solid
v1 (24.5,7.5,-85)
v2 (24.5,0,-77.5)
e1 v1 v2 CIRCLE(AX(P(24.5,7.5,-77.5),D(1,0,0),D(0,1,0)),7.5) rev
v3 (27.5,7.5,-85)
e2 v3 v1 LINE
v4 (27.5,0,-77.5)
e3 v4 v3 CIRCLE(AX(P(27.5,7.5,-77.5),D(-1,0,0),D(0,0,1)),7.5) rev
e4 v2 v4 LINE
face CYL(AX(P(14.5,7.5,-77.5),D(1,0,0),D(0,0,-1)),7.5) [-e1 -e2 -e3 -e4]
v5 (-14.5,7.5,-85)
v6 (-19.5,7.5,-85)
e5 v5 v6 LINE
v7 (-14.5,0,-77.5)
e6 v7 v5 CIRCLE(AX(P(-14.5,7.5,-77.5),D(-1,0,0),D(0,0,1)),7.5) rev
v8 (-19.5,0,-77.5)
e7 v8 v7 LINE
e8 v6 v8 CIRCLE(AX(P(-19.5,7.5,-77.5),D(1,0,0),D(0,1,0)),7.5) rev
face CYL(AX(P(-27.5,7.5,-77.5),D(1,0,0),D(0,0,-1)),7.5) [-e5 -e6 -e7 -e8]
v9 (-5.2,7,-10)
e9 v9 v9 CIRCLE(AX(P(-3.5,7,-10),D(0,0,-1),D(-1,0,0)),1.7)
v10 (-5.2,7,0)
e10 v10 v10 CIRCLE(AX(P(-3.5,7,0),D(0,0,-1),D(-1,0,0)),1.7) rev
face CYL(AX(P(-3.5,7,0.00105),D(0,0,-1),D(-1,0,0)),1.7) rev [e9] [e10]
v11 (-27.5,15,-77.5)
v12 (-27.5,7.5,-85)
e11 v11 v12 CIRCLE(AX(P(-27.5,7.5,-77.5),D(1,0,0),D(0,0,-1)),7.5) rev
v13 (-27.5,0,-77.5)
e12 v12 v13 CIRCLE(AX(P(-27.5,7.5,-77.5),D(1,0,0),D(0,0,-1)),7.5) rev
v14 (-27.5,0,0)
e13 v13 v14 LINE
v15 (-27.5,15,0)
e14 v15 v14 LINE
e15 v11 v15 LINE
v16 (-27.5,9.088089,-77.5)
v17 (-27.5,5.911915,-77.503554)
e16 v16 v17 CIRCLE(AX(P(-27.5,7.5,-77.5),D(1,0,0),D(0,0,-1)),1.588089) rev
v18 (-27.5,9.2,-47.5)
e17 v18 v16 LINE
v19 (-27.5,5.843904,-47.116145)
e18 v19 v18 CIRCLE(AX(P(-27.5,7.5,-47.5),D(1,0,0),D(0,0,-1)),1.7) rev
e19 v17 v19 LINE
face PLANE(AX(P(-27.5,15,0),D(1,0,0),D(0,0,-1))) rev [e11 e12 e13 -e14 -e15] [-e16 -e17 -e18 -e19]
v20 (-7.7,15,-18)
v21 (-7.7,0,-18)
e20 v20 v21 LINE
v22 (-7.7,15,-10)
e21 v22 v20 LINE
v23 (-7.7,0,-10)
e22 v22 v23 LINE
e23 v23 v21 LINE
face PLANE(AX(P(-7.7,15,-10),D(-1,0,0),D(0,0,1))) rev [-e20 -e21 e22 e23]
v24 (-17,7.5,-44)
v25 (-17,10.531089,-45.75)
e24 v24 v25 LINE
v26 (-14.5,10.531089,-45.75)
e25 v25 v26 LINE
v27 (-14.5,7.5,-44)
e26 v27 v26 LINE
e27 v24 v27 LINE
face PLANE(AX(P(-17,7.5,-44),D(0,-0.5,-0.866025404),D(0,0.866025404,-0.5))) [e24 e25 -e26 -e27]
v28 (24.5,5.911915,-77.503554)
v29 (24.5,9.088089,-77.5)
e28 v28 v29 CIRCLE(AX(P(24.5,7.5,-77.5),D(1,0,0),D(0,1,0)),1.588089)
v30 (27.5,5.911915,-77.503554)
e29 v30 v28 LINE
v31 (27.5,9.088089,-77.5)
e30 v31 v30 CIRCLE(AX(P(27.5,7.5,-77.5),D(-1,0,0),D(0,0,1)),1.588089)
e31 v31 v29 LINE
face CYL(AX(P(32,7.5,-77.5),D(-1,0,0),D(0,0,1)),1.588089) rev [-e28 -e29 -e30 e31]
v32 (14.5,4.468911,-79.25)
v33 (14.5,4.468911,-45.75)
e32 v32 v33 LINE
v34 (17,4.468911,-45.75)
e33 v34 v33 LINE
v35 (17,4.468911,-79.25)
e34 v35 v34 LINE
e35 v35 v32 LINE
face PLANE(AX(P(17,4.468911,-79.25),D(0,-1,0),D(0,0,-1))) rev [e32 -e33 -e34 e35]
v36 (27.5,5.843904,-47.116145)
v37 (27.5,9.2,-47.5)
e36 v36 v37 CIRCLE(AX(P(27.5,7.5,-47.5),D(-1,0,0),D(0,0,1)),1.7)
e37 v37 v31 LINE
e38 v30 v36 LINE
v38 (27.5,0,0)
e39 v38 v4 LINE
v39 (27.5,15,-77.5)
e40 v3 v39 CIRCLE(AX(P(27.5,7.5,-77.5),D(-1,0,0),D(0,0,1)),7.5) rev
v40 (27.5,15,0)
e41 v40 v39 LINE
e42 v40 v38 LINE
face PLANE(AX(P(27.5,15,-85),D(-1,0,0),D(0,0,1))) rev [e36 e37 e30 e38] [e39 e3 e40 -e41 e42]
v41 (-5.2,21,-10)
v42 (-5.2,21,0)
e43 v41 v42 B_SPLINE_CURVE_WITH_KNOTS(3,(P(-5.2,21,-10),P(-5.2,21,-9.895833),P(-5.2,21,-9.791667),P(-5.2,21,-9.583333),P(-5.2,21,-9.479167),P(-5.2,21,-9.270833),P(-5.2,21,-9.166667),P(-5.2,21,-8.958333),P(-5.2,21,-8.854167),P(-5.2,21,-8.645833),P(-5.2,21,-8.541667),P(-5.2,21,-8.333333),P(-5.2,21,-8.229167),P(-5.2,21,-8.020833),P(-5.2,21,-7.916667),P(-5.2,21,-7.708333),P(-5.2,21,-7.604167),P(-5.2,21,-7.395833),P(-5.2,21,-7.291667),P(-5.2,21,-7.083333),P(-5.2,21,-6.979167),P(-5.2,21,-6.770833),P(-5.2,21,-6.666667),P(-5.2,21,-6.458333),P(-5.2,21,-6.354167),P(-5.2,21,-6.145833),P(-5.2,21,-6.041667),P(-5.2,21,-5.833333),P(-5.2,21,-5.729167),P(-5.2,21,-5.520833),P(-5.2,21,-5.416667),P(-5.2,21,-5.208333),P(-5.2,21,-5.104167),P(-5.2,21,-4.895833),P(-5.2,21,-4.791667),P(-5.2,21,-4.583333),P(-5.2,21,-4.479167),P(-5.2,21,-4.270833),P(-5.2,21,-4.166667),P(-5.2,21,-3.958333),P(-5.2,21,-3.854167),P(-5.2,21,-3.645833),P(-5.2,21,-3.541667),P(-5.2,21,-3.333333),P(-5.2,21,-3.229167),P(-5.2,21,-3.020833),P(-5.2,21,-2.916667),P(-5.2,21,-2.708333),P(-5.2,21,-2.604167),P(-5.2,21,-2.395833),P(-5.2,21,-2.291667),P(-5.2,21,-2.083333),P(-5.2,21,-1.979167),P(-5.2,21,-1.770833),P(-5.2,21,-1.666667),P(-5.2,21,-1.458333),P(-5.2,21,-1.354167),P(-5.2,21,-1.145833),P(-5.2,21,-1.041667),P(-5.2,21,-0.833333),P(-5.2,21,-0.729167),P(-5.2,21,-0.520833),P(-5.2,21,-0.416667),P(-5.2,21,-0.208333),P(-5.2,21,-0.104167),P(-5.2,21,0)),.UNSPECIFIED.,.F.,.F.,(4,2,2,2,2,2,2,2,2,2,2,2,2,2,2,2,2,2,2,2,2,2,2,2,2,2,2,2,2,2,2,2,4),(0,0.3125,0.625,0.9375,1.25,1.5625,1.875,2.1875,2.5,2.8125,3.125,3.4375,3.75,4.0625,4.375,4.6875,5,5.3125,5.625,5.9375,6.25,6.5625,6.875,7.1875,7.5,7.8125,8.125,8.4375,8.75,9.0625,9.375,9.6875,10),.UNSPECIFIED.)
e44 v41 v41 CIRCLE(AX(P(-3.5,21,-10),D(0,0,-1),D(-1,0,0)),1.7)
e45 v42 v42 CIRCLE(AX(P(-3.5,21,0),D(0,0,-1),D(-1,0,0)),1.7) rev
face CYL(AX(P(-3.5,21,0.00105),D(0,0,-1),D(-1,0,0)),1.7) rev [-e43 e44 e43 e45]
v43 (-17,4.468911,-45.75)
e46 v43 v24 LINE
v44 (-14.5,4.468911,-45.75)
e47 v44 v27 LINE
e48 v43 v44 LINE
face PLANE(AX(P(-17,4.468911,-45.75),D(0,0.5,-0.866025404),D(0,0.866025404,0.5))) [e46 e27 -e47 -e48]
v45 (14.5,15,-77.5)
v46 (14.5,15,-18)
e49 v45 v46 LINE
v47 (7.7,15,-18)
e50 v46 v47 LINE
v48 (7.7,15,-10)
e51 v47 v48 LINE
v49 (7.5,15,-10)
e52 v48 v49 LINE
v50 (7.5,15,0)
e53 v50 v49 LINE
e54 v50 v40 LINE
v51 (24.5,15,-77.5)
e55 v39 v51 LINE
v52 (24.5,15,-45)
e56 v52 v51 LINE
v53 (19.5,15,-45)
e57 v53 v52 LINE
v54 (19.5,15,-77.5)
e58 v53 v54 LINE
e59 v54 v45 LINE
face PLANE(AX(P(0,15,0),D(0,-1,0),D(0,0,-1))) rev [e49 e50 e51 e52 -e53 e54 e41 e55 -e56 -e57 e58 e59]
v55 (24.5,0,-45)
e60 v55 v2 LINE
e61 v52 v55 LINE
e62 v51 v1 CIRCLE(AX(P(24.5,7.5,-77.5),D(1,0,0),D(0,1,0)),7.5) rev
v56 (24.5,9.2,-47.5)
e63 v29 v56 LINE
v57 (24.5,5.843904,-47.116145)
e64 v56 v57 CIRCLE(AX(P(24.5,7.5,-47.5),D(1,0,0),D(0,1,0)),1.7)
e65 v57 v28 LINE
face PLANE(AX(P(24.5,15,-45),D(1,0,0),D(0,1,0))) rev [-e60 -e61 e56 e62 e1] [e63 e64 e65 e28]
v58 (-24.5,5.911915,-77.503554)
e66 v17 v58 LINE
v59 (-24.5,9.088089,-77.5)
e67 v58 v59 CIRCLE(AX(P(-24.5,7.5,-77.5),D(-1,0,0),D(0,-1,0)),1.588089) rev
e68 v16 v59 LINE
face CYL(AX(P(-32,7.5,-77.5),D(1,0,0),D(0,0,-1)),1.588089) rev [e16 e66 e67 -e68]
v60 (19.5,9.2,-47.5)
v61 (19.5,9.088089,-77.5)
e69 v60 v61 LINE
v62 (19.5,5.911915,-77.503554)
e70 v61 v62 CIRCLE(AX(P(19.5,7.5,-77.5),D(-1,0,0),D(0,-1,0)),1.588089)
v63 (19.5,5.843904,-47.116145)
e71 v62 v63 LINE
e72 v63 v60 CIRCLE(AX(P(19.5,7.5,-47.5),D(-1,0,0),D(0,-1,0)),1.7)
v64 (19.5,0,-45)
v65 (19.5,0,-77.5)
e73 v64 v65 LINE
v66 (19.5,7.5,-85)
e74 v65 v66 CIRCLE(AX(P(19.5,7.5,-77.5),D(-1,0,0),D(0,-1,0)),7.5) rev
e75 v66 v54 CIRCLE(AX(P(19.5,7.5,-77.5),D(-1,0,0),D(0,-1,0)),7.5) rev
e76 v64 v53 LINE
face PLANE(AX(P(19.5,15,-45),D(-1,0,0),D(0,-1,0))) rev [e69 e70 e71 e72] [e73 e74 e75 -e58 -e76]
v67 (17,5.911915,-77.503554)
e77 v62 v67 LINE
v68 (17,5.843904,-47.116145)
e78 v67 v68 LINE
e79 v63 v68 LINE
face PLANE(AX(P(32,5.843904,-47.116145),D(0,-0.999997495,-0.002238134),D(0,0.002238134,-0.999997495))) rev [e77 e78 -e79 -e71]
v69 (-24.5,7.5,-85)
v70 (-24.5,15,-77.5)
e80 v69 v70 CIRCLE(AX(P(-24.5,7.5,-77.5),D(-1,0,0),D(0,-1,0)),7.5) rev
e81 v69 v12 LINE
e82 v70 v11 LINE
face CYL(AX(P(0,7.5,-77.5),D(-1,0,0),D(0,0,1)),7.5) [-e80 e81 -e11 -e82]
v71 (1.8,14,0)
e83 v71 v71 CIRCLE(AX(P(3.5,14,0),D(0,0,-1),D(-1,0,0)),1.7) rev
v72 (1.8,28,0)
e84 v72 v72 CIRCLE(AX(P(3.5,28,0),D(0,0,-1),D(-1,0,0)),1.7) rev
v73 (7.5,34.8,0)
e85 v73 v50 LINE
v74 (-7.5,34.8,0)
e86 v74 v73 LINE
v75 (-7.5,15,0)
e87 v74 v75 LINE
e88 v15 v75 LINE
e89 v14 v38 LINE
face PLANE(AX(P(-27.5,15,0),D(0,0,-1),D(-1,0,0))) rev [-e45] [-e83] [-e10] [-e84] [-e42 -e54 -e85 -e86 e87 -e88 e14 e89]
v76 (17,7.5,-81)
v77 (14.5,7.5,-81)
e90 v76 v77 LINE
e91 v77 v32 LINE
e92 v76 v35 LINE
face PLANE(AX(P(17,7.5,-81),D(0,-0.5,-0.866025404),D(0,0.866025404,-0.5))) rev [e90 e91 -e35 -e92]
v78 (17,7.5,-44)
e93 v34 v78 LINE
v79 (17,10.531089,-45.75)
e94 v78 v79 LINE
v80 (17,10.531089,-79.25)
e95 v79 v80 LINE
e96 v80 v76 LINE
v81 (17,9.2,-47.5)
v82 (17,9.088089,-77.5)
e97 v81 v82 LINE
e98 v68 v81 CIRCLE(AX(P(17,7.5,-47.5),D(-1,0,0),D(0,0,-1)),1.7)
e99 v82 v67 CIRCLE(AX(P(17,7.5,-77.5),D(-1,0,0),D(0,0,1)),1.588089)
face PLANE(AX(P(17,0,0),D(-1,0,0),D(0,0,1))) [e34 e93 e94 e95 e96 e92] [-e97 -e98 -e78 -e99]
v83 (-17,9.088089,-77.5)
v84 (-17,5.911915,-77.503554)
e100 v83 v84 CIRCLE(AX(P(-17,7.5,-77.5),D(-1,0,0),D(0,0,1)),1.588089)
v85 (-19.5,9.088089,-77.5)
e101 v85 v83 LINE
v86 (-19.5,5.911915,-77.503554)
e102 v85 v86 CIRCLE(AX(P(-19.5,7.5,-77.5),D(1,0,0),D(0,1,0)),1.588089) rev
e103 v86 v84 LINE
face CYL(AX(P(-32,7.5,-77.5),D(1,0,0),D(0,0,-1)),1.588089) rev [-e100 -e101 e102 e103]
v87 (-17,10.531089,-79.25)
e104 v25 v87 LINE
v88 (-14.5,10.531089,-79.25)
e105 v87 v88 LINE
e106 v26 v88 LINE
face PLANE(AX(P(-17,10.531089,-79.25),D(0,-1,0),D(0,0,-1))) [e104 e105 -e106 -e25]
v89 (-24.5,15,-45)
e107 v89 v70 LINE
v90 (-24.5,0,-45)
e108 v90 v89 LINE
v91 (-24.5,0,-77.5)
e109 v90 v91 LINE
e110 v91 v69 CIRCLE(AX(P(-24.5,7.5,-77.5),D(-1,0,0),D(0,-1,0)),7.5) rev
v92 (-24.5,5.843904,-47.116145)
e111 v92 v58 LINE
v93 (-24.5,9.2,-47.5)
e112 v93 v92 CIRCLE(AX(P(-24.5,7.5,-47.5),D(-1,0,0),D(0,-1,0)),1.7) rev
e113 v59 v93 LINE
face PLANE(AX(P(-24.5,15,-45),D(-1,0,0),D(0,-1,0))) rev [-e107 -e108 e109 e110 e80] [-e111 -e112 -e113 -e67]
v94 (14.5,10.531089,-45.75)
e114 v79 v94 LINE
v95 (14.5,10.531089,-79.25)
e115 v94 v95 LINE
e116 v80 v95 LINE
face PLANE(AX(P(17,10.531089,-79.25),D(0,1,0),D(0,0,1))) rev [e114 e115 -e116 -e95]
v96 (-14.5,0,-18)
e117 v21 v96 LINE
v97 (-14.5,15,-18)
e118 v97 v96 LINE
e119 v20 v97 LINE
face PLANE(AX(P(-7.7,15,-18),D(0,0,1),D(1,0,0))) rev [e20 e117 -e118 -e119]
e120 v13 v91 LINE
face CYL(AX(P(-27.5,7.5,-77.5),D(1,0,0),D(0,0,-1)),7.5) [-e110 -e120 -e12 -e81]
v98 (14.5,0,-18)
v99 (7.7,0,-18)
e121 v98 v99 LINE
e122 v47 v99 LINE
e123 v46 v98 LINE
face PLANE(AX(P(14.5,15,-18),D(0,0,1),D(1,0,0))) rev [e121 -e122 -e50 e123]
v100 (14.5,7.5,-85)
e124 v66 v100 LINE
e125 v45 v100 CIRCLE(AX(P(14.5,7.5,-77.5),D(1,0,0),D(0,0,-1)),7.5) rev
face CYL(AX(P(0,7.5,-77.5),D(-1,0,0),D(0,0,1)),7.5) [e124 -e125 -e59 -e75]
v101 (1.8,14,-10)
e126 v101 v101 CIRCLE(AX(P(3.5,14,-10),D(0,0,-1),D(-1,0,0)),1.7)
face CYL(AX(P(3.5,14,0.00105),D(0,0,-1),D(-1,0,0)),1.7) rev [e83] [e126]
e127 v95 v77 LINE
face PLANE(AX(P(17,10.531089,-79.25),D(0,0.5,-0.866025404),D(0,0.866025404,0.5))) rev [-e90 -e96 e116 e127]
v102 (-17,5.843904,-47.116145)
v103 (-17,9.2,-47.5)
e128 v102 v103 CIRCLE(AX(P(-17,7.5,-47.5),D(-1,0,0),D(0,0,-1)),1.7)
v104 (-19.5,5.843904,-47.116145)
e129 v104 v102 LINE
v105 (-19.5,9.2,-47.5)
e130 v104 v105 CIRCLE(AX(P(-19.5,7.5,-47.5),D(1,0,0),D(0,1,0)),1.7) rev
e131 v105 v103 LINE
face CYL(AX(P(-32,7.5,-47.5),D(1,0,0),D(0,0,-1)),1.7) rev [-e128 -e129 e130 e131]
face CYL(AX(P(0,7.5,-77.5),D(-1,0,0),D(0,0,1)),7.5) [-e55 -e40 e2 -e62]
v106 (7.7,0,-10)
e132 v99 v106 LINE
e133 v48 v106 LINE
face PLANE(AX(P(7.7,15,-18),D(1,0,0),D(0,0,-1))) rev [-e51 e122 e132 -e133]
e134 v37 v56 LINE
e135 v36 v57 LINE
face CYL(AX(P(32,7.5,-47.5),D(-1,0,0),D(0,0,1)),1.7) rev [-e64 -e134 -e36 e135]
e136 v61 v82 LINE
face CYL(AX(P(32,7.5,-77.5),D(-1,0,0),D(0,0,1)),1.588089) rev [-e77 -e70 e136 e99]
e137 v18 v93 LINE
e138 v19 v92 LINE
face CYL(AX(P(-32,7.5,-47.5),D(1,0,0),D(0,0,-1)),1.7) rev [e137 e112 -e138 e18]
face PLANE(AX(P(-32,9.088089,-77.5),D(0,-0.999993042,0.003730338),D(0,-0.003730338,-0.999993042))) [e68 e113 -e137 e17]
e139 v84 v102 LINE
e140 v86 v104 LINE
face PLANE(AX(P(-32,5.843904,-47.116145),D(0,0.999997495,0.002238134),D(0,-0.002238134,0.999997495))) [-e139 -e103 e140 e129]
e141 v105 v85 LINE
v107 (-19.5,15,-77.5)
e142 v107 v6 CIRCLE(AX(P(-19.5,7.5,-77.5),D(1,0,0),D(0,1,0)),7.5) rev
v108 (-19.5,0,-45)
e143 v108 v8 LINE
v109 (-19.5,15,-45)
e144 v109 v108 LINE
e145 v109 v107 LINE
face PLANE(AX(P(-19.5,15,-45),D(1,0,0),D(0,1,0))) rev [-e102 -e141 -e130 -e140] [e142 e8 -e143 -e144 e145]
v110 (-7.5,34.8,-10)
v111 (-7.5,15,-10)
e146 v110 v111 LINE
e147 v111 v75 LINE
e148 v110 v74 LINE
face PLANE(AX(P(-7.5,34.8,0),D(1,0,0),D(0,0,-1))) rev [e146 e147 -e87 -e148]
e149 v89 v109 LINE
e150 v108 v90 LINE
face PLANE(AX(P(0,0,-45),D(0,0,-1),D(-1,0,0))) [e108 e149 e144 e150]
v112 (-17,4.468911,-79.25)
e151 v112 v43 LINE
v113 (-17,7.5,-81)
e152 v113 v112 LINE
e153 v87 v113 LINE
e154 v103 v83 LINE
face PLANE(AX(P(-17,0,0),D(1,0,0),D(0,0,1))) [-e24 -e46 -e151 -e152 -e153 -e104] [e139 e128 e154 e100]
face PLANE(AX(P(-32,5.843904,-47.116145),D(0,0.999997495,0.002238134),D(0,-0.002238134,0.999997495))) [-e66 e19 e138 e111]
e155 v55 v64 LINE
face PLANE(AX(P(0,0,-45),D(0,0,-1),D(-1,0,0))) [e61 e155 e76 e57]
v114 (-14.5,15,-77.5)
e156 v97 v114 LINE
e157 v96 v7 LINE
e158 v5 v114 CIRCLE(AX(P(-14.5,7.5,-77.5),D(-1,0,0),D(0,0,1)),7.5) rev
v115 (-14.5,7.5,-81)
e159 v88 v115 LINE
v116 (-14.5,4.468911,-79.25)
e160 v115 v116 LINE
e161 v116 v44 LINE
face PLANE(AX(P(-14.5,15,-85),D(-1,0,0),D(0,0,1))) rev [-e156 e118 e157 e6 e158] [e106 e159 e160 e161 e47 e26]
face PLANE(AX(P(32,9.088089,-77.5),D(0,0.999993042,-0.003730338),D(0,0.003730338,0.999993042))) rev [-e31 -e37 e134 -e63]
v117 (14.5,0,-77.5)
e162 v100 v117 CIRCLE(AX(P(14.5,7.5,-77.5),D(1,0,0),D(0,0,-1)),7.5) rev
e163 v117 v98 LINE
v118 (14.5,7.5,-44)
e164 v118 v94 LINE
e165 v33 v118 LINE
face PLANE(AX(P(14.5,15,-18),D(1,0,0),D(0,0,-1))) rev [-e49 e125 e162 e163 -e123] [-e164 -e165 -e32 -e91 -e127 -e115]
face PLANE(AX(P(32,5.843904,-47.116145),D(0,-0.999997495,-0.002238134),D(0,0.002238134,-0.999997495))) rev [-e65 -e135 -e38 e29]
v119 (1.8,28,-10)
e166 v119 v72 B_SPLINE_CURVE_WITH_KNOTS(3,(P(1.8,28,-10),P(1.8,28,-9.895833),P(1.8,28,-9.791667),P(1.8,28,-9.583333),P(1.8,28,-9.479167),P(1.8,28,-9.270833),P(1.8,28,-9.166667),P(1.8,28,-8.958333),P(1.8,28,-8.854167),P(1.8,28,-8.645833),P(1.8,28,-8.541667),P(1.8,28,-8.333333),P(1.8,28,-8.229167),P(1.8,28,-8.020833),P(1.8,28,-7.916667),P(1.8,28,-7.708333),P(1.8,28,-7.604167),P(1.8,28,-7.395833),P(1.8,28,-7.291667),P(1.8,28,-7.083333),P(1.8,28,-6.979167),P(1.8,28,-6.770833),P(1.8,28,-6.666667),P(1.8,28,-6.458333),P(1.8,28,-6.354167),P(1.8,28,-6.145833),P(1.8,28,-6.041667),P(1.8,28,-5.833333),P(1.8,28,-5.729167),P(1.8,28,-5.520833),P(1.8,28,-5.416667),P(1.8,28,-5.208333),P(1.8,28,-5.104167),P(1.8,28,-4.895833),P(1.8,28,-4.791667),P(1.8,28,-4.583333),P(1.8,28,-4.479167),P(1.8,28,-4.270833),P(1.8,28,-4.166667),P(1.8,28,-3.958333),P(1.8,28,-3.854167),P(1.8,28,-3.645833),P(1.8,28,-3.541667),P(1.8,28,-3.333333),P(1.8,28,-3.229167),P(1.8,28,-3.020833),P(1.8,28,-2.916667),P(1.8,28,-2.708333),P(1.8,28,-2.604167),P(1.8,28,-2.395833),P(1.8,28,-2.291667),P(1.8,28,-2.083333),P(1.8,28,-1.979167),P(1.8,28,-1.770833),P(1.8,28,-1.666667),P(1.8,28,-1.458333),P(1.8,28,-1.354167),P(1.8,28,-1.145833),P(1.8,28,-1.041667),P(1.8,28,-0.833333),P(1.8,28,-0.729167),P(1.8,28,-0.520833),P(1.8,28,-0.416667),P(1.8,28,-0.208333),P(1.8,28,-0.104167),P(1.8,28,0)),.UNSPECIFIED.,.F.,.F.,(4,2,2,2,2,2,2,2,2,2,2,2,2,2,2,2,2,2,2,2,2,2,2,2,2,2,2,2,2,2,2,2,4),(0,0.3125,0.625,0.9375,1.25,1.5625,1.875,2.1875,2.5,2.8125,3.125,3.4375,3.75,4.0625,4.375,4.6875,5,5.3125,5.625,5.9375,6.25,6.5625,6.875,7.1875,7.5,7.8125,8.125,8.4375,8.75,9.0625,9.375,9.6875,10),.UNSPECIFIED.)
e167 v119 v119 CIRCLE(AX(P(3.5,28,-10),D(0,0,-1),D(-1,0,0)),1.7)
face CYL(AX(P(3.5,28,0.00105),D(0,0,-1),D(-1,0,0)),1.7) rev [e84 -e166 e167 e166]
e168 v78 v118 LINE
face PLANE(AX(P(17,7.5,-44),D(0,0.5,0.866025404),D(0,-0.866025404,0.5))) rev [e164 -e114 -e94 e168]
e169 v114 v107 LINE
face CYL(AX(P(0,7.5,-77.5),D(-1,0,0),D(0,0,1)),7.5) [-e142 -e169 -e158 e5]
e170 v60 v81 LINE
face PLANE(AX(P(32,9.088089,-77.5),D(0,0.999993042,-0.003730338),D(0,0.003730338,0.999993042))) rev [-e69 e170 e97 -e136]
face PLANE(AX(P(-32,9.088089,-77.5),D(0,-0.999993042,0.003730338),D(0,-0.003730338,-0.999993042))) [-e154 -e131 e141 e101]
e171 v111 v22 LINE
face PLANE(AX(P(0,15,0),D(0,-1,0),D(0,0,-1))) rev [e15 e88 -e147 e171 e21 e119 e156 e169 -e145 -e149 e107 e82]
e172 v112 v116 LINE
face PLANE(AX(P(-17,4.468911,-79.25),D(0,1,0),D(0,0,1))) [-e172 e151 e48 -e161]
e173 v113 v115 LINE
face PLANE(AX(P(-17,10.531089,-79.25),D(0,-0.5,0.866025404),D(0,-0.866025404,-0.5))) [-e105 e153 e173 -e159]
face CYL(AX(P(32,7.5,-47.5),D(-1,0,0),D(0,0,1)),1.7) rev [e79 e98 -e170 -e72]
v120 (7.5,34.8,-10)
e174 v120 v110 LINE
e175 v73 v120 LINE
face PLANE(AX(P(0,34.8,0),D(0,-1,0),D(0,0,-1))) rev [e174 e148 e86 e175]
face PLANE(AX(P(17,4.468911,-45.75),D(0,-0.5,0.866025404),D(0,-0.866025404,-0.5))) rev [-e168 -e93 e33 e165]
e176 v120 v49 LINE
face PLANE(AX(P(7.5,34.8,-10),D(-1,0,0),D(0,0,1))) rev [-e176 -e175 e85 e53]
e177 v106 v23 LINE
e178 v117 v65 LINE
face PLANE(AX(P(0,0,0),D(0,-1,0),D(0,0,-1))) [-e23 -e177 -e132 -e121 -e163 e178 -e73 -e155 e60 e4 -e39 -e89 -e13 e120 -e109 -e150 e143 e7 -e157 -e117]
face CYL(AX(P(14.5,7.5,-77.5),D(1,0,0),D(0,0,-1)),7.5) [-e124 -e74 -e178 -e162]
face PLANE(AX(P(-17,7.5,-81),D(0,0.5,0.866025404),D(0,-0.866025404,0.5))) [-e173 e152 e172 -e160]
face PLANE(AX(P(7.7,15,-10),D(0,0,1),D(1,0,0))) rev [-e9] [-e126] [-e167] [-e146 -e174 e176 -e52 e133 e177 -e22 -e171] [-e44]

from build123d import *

# Parameters (mm, degrees)
BOSS_EXTRUDE1_DEPTH = 15
SKETCH2_W           = 15
SKETCH2_H           = 10
BOSS_EXTRUDE2_DEPTH = 19.8
SKETCH3_W           = 5
SKETCH3_H           = 15
CUT_EXTRUDE1_DEPTH  = 40
CUT_EXTRUDE2_REACH  = 89.134
SKETCH4_R           = 1.7
LPATTERN1_COUNT     = 2
LPATTERN1_PITCH     = 14
CUT_EXTRUDE3_DEPTH  = 2.5
CUT_EXTRUDE4_DEPTH  = 15
FILLET1_R           = 7.5


with BuildPart() as part:
    # Sketch1 → Boss-Extrude1 (new body)
    with BuildSketch(Plane(origin=(0, 0, 0), x_dir=(1, 0, 0), z_dir=(0, 1, 0))):
        Polygon((-27.5, 0), (27.5, 0), (27.5, 85), (14.5, 85), (14.5, 18), (7.7, 18), (7.7, 10), (-7.7, 10), (-7.7, 18), (-14.5, 18), (-14.5, 85), (-27.5, 85), align=None)
    extrude(amount=BOSS_EXTRUDE1_DEPTH)

    # Sketch2 → Boss-Extrude2 (add)
    with BuildSketch(Plane(origin=(0, 15, 0), x_dir=(1, 0, 0), z_dir=(0, 1, 0))):
        with Locations((0, 5)):
            Rectangle(SKETCH2_W, SKETCH2_H)
    extrude(amount=BOSS_EXTRUDE2_DEPTH)

    # Sketch3 → Cut-Extrude1 (cut)
    with BuildSketch(Plane(origin=(0, 0, -85), x_dir=(-1, 0, 0), z_dir=(0, 0, -1))):
        with Locations((22, 7.5)):
            Rectangle(SKETCH3_W, SKETCH3_H)
        with Locations((-22, 7.5)):
            Rectangle(SKETCH3_W, SKETCH3_H)
    extrude(amount=-CUT_EXTRUDE1_DEPTH, mode=Mode.SUBTRACT)

    # Sketch4 → Cut-Extrude2 (cut, up to next)
    with BuildSketch(Plane(origin=(0, 0, -10), x_dir=(-1, 0, 0), z_dir=(0, 0, -1)), mode=Mode.PRIVATE) as cut_extrude2_sk1:
        with Locations((-3.5, 28)):
            Circle(SKETCH4_R)
    cut_extrude2_tool1 = extrude(cut_extrude2_sk1.sketch, amount=-CUT_EXTRUDE2_REACH, mode=Mode.PRIVATE) & part.part
    # Sketch4 → Cut-Extrude2 (cut, up to next)
    with BuildSketch(Plane(origin=(0, 0, -10), x_dir=(-1, 0, 0), z_dir=(0, 0, -1)), mode=Mode.PRIVATE) as cut_extrude2_sk2:
        with Locations((3.5, 21)):
            Circle(SKETCH4_R)
    cut_extrude2_tool2 = extrude(cut_extrude2_sk2.sketch, amount=-CUT_EXTRUDE2_REACH, mode=Mode.PRIVATE) & part.part
    cut_extrude2_1 = cut_extrude2_tool1.solids().sort_by_distance((3.5, 28, -10))[0]
    add(cut_extrude2_1, mode=Mode.SUBTRACT)
    cut_extrude2_2 = cut_extrude2_tool2.solids().sort_by_distance((-3.5, 21, -10))[0]
    add(cut_extrude2_2, mode=Mode.SUBTRACT)
    cut_extrude2 = cut_extrude2_1 + cut_extrude2_2  # Cut-Extrude2 as one shape, for the pattern or mirror that repeats it

    # LPattern1: Cut-Extrude2 ×2
    with Locations(*[(0, -i * LPATTERN1_PITCH, 0) for i in range(1, LPATTERN1_COUNT)]):
        add(cut_extrude2, mode=Mode.SUBTRACT)

    # Sketch5 → Cut-Extrude3 (cut)
    with BuildSketch(Plane.ZY.offset(-14.5)):
        Polygon((-79.25, 10.531088913), (-45.75, 10.531088913), (-44, 7.5), (-45.75, 4.468911087), (-79.25, 4.468911087), (-81, 7.5), align=None)
    cut_extrude3 = extrude(amount=-CUT_EXTRUDE3_DEPTH, mode=Mode.SUBTRACT)

    # Sketch6 → Cut-Extrude4 (cut)
    with BuildSketch(Plane.ZY.offset(-17)):
        with BuildLine():
            Line((-77.5, 9.088089066), (-47.5, 9.2))
            ThreePointArc((-47.5, 9.2), (-45.811011578, 7.693178963), (-47.116144669, 5.843903661))
            Line((-47.116144669, 5.843903661), (-77.503554355, 5.911914911))
            ThreePointArc((-77.503554355, 5.911914911), (-79.088088072, 7.501777179), (-77.5, 9.088089066))
        make_face()
    cut_extrude4 = extrude(amount=-CUT_EXTRUDE4_DEPTH, mode=Mode.SUBTRACT)

    # Mirror1: Cut-Extrude3, Cut-Extrude4 across plane
    add(cut_extrude3.mirror(Plane(origin=(0, 0, 0), x_dir=(0, 0, 1), z_dir=(1, 0, 0))), mode=Mode.SUBTRACT)
    add(cut_extrude4.mirror(Plane(origin=(0, 0, 0), x_dir=(0, 0, 1), z_dir=(1, 0, 0))), mode=Mode.SUBTRACT)

    # Fillet1
    fillet1_edges = [part.edges().sort_by_distance(p)[0] for p in [
        (26, 15, -85),
        (17, 15, -85),
        (-17, 15, -85),
        (-26, 15, -85),
        (26, 0, -85),
        (17, 0, -85),
        (-17, 0, -85),
        (-26, 0, -85),
    ]]
    fillet(fillet1_edges, radius=FILLET1_R - 0.0001)  # a hair under: the kernel refuses the full size


solid = part.part
